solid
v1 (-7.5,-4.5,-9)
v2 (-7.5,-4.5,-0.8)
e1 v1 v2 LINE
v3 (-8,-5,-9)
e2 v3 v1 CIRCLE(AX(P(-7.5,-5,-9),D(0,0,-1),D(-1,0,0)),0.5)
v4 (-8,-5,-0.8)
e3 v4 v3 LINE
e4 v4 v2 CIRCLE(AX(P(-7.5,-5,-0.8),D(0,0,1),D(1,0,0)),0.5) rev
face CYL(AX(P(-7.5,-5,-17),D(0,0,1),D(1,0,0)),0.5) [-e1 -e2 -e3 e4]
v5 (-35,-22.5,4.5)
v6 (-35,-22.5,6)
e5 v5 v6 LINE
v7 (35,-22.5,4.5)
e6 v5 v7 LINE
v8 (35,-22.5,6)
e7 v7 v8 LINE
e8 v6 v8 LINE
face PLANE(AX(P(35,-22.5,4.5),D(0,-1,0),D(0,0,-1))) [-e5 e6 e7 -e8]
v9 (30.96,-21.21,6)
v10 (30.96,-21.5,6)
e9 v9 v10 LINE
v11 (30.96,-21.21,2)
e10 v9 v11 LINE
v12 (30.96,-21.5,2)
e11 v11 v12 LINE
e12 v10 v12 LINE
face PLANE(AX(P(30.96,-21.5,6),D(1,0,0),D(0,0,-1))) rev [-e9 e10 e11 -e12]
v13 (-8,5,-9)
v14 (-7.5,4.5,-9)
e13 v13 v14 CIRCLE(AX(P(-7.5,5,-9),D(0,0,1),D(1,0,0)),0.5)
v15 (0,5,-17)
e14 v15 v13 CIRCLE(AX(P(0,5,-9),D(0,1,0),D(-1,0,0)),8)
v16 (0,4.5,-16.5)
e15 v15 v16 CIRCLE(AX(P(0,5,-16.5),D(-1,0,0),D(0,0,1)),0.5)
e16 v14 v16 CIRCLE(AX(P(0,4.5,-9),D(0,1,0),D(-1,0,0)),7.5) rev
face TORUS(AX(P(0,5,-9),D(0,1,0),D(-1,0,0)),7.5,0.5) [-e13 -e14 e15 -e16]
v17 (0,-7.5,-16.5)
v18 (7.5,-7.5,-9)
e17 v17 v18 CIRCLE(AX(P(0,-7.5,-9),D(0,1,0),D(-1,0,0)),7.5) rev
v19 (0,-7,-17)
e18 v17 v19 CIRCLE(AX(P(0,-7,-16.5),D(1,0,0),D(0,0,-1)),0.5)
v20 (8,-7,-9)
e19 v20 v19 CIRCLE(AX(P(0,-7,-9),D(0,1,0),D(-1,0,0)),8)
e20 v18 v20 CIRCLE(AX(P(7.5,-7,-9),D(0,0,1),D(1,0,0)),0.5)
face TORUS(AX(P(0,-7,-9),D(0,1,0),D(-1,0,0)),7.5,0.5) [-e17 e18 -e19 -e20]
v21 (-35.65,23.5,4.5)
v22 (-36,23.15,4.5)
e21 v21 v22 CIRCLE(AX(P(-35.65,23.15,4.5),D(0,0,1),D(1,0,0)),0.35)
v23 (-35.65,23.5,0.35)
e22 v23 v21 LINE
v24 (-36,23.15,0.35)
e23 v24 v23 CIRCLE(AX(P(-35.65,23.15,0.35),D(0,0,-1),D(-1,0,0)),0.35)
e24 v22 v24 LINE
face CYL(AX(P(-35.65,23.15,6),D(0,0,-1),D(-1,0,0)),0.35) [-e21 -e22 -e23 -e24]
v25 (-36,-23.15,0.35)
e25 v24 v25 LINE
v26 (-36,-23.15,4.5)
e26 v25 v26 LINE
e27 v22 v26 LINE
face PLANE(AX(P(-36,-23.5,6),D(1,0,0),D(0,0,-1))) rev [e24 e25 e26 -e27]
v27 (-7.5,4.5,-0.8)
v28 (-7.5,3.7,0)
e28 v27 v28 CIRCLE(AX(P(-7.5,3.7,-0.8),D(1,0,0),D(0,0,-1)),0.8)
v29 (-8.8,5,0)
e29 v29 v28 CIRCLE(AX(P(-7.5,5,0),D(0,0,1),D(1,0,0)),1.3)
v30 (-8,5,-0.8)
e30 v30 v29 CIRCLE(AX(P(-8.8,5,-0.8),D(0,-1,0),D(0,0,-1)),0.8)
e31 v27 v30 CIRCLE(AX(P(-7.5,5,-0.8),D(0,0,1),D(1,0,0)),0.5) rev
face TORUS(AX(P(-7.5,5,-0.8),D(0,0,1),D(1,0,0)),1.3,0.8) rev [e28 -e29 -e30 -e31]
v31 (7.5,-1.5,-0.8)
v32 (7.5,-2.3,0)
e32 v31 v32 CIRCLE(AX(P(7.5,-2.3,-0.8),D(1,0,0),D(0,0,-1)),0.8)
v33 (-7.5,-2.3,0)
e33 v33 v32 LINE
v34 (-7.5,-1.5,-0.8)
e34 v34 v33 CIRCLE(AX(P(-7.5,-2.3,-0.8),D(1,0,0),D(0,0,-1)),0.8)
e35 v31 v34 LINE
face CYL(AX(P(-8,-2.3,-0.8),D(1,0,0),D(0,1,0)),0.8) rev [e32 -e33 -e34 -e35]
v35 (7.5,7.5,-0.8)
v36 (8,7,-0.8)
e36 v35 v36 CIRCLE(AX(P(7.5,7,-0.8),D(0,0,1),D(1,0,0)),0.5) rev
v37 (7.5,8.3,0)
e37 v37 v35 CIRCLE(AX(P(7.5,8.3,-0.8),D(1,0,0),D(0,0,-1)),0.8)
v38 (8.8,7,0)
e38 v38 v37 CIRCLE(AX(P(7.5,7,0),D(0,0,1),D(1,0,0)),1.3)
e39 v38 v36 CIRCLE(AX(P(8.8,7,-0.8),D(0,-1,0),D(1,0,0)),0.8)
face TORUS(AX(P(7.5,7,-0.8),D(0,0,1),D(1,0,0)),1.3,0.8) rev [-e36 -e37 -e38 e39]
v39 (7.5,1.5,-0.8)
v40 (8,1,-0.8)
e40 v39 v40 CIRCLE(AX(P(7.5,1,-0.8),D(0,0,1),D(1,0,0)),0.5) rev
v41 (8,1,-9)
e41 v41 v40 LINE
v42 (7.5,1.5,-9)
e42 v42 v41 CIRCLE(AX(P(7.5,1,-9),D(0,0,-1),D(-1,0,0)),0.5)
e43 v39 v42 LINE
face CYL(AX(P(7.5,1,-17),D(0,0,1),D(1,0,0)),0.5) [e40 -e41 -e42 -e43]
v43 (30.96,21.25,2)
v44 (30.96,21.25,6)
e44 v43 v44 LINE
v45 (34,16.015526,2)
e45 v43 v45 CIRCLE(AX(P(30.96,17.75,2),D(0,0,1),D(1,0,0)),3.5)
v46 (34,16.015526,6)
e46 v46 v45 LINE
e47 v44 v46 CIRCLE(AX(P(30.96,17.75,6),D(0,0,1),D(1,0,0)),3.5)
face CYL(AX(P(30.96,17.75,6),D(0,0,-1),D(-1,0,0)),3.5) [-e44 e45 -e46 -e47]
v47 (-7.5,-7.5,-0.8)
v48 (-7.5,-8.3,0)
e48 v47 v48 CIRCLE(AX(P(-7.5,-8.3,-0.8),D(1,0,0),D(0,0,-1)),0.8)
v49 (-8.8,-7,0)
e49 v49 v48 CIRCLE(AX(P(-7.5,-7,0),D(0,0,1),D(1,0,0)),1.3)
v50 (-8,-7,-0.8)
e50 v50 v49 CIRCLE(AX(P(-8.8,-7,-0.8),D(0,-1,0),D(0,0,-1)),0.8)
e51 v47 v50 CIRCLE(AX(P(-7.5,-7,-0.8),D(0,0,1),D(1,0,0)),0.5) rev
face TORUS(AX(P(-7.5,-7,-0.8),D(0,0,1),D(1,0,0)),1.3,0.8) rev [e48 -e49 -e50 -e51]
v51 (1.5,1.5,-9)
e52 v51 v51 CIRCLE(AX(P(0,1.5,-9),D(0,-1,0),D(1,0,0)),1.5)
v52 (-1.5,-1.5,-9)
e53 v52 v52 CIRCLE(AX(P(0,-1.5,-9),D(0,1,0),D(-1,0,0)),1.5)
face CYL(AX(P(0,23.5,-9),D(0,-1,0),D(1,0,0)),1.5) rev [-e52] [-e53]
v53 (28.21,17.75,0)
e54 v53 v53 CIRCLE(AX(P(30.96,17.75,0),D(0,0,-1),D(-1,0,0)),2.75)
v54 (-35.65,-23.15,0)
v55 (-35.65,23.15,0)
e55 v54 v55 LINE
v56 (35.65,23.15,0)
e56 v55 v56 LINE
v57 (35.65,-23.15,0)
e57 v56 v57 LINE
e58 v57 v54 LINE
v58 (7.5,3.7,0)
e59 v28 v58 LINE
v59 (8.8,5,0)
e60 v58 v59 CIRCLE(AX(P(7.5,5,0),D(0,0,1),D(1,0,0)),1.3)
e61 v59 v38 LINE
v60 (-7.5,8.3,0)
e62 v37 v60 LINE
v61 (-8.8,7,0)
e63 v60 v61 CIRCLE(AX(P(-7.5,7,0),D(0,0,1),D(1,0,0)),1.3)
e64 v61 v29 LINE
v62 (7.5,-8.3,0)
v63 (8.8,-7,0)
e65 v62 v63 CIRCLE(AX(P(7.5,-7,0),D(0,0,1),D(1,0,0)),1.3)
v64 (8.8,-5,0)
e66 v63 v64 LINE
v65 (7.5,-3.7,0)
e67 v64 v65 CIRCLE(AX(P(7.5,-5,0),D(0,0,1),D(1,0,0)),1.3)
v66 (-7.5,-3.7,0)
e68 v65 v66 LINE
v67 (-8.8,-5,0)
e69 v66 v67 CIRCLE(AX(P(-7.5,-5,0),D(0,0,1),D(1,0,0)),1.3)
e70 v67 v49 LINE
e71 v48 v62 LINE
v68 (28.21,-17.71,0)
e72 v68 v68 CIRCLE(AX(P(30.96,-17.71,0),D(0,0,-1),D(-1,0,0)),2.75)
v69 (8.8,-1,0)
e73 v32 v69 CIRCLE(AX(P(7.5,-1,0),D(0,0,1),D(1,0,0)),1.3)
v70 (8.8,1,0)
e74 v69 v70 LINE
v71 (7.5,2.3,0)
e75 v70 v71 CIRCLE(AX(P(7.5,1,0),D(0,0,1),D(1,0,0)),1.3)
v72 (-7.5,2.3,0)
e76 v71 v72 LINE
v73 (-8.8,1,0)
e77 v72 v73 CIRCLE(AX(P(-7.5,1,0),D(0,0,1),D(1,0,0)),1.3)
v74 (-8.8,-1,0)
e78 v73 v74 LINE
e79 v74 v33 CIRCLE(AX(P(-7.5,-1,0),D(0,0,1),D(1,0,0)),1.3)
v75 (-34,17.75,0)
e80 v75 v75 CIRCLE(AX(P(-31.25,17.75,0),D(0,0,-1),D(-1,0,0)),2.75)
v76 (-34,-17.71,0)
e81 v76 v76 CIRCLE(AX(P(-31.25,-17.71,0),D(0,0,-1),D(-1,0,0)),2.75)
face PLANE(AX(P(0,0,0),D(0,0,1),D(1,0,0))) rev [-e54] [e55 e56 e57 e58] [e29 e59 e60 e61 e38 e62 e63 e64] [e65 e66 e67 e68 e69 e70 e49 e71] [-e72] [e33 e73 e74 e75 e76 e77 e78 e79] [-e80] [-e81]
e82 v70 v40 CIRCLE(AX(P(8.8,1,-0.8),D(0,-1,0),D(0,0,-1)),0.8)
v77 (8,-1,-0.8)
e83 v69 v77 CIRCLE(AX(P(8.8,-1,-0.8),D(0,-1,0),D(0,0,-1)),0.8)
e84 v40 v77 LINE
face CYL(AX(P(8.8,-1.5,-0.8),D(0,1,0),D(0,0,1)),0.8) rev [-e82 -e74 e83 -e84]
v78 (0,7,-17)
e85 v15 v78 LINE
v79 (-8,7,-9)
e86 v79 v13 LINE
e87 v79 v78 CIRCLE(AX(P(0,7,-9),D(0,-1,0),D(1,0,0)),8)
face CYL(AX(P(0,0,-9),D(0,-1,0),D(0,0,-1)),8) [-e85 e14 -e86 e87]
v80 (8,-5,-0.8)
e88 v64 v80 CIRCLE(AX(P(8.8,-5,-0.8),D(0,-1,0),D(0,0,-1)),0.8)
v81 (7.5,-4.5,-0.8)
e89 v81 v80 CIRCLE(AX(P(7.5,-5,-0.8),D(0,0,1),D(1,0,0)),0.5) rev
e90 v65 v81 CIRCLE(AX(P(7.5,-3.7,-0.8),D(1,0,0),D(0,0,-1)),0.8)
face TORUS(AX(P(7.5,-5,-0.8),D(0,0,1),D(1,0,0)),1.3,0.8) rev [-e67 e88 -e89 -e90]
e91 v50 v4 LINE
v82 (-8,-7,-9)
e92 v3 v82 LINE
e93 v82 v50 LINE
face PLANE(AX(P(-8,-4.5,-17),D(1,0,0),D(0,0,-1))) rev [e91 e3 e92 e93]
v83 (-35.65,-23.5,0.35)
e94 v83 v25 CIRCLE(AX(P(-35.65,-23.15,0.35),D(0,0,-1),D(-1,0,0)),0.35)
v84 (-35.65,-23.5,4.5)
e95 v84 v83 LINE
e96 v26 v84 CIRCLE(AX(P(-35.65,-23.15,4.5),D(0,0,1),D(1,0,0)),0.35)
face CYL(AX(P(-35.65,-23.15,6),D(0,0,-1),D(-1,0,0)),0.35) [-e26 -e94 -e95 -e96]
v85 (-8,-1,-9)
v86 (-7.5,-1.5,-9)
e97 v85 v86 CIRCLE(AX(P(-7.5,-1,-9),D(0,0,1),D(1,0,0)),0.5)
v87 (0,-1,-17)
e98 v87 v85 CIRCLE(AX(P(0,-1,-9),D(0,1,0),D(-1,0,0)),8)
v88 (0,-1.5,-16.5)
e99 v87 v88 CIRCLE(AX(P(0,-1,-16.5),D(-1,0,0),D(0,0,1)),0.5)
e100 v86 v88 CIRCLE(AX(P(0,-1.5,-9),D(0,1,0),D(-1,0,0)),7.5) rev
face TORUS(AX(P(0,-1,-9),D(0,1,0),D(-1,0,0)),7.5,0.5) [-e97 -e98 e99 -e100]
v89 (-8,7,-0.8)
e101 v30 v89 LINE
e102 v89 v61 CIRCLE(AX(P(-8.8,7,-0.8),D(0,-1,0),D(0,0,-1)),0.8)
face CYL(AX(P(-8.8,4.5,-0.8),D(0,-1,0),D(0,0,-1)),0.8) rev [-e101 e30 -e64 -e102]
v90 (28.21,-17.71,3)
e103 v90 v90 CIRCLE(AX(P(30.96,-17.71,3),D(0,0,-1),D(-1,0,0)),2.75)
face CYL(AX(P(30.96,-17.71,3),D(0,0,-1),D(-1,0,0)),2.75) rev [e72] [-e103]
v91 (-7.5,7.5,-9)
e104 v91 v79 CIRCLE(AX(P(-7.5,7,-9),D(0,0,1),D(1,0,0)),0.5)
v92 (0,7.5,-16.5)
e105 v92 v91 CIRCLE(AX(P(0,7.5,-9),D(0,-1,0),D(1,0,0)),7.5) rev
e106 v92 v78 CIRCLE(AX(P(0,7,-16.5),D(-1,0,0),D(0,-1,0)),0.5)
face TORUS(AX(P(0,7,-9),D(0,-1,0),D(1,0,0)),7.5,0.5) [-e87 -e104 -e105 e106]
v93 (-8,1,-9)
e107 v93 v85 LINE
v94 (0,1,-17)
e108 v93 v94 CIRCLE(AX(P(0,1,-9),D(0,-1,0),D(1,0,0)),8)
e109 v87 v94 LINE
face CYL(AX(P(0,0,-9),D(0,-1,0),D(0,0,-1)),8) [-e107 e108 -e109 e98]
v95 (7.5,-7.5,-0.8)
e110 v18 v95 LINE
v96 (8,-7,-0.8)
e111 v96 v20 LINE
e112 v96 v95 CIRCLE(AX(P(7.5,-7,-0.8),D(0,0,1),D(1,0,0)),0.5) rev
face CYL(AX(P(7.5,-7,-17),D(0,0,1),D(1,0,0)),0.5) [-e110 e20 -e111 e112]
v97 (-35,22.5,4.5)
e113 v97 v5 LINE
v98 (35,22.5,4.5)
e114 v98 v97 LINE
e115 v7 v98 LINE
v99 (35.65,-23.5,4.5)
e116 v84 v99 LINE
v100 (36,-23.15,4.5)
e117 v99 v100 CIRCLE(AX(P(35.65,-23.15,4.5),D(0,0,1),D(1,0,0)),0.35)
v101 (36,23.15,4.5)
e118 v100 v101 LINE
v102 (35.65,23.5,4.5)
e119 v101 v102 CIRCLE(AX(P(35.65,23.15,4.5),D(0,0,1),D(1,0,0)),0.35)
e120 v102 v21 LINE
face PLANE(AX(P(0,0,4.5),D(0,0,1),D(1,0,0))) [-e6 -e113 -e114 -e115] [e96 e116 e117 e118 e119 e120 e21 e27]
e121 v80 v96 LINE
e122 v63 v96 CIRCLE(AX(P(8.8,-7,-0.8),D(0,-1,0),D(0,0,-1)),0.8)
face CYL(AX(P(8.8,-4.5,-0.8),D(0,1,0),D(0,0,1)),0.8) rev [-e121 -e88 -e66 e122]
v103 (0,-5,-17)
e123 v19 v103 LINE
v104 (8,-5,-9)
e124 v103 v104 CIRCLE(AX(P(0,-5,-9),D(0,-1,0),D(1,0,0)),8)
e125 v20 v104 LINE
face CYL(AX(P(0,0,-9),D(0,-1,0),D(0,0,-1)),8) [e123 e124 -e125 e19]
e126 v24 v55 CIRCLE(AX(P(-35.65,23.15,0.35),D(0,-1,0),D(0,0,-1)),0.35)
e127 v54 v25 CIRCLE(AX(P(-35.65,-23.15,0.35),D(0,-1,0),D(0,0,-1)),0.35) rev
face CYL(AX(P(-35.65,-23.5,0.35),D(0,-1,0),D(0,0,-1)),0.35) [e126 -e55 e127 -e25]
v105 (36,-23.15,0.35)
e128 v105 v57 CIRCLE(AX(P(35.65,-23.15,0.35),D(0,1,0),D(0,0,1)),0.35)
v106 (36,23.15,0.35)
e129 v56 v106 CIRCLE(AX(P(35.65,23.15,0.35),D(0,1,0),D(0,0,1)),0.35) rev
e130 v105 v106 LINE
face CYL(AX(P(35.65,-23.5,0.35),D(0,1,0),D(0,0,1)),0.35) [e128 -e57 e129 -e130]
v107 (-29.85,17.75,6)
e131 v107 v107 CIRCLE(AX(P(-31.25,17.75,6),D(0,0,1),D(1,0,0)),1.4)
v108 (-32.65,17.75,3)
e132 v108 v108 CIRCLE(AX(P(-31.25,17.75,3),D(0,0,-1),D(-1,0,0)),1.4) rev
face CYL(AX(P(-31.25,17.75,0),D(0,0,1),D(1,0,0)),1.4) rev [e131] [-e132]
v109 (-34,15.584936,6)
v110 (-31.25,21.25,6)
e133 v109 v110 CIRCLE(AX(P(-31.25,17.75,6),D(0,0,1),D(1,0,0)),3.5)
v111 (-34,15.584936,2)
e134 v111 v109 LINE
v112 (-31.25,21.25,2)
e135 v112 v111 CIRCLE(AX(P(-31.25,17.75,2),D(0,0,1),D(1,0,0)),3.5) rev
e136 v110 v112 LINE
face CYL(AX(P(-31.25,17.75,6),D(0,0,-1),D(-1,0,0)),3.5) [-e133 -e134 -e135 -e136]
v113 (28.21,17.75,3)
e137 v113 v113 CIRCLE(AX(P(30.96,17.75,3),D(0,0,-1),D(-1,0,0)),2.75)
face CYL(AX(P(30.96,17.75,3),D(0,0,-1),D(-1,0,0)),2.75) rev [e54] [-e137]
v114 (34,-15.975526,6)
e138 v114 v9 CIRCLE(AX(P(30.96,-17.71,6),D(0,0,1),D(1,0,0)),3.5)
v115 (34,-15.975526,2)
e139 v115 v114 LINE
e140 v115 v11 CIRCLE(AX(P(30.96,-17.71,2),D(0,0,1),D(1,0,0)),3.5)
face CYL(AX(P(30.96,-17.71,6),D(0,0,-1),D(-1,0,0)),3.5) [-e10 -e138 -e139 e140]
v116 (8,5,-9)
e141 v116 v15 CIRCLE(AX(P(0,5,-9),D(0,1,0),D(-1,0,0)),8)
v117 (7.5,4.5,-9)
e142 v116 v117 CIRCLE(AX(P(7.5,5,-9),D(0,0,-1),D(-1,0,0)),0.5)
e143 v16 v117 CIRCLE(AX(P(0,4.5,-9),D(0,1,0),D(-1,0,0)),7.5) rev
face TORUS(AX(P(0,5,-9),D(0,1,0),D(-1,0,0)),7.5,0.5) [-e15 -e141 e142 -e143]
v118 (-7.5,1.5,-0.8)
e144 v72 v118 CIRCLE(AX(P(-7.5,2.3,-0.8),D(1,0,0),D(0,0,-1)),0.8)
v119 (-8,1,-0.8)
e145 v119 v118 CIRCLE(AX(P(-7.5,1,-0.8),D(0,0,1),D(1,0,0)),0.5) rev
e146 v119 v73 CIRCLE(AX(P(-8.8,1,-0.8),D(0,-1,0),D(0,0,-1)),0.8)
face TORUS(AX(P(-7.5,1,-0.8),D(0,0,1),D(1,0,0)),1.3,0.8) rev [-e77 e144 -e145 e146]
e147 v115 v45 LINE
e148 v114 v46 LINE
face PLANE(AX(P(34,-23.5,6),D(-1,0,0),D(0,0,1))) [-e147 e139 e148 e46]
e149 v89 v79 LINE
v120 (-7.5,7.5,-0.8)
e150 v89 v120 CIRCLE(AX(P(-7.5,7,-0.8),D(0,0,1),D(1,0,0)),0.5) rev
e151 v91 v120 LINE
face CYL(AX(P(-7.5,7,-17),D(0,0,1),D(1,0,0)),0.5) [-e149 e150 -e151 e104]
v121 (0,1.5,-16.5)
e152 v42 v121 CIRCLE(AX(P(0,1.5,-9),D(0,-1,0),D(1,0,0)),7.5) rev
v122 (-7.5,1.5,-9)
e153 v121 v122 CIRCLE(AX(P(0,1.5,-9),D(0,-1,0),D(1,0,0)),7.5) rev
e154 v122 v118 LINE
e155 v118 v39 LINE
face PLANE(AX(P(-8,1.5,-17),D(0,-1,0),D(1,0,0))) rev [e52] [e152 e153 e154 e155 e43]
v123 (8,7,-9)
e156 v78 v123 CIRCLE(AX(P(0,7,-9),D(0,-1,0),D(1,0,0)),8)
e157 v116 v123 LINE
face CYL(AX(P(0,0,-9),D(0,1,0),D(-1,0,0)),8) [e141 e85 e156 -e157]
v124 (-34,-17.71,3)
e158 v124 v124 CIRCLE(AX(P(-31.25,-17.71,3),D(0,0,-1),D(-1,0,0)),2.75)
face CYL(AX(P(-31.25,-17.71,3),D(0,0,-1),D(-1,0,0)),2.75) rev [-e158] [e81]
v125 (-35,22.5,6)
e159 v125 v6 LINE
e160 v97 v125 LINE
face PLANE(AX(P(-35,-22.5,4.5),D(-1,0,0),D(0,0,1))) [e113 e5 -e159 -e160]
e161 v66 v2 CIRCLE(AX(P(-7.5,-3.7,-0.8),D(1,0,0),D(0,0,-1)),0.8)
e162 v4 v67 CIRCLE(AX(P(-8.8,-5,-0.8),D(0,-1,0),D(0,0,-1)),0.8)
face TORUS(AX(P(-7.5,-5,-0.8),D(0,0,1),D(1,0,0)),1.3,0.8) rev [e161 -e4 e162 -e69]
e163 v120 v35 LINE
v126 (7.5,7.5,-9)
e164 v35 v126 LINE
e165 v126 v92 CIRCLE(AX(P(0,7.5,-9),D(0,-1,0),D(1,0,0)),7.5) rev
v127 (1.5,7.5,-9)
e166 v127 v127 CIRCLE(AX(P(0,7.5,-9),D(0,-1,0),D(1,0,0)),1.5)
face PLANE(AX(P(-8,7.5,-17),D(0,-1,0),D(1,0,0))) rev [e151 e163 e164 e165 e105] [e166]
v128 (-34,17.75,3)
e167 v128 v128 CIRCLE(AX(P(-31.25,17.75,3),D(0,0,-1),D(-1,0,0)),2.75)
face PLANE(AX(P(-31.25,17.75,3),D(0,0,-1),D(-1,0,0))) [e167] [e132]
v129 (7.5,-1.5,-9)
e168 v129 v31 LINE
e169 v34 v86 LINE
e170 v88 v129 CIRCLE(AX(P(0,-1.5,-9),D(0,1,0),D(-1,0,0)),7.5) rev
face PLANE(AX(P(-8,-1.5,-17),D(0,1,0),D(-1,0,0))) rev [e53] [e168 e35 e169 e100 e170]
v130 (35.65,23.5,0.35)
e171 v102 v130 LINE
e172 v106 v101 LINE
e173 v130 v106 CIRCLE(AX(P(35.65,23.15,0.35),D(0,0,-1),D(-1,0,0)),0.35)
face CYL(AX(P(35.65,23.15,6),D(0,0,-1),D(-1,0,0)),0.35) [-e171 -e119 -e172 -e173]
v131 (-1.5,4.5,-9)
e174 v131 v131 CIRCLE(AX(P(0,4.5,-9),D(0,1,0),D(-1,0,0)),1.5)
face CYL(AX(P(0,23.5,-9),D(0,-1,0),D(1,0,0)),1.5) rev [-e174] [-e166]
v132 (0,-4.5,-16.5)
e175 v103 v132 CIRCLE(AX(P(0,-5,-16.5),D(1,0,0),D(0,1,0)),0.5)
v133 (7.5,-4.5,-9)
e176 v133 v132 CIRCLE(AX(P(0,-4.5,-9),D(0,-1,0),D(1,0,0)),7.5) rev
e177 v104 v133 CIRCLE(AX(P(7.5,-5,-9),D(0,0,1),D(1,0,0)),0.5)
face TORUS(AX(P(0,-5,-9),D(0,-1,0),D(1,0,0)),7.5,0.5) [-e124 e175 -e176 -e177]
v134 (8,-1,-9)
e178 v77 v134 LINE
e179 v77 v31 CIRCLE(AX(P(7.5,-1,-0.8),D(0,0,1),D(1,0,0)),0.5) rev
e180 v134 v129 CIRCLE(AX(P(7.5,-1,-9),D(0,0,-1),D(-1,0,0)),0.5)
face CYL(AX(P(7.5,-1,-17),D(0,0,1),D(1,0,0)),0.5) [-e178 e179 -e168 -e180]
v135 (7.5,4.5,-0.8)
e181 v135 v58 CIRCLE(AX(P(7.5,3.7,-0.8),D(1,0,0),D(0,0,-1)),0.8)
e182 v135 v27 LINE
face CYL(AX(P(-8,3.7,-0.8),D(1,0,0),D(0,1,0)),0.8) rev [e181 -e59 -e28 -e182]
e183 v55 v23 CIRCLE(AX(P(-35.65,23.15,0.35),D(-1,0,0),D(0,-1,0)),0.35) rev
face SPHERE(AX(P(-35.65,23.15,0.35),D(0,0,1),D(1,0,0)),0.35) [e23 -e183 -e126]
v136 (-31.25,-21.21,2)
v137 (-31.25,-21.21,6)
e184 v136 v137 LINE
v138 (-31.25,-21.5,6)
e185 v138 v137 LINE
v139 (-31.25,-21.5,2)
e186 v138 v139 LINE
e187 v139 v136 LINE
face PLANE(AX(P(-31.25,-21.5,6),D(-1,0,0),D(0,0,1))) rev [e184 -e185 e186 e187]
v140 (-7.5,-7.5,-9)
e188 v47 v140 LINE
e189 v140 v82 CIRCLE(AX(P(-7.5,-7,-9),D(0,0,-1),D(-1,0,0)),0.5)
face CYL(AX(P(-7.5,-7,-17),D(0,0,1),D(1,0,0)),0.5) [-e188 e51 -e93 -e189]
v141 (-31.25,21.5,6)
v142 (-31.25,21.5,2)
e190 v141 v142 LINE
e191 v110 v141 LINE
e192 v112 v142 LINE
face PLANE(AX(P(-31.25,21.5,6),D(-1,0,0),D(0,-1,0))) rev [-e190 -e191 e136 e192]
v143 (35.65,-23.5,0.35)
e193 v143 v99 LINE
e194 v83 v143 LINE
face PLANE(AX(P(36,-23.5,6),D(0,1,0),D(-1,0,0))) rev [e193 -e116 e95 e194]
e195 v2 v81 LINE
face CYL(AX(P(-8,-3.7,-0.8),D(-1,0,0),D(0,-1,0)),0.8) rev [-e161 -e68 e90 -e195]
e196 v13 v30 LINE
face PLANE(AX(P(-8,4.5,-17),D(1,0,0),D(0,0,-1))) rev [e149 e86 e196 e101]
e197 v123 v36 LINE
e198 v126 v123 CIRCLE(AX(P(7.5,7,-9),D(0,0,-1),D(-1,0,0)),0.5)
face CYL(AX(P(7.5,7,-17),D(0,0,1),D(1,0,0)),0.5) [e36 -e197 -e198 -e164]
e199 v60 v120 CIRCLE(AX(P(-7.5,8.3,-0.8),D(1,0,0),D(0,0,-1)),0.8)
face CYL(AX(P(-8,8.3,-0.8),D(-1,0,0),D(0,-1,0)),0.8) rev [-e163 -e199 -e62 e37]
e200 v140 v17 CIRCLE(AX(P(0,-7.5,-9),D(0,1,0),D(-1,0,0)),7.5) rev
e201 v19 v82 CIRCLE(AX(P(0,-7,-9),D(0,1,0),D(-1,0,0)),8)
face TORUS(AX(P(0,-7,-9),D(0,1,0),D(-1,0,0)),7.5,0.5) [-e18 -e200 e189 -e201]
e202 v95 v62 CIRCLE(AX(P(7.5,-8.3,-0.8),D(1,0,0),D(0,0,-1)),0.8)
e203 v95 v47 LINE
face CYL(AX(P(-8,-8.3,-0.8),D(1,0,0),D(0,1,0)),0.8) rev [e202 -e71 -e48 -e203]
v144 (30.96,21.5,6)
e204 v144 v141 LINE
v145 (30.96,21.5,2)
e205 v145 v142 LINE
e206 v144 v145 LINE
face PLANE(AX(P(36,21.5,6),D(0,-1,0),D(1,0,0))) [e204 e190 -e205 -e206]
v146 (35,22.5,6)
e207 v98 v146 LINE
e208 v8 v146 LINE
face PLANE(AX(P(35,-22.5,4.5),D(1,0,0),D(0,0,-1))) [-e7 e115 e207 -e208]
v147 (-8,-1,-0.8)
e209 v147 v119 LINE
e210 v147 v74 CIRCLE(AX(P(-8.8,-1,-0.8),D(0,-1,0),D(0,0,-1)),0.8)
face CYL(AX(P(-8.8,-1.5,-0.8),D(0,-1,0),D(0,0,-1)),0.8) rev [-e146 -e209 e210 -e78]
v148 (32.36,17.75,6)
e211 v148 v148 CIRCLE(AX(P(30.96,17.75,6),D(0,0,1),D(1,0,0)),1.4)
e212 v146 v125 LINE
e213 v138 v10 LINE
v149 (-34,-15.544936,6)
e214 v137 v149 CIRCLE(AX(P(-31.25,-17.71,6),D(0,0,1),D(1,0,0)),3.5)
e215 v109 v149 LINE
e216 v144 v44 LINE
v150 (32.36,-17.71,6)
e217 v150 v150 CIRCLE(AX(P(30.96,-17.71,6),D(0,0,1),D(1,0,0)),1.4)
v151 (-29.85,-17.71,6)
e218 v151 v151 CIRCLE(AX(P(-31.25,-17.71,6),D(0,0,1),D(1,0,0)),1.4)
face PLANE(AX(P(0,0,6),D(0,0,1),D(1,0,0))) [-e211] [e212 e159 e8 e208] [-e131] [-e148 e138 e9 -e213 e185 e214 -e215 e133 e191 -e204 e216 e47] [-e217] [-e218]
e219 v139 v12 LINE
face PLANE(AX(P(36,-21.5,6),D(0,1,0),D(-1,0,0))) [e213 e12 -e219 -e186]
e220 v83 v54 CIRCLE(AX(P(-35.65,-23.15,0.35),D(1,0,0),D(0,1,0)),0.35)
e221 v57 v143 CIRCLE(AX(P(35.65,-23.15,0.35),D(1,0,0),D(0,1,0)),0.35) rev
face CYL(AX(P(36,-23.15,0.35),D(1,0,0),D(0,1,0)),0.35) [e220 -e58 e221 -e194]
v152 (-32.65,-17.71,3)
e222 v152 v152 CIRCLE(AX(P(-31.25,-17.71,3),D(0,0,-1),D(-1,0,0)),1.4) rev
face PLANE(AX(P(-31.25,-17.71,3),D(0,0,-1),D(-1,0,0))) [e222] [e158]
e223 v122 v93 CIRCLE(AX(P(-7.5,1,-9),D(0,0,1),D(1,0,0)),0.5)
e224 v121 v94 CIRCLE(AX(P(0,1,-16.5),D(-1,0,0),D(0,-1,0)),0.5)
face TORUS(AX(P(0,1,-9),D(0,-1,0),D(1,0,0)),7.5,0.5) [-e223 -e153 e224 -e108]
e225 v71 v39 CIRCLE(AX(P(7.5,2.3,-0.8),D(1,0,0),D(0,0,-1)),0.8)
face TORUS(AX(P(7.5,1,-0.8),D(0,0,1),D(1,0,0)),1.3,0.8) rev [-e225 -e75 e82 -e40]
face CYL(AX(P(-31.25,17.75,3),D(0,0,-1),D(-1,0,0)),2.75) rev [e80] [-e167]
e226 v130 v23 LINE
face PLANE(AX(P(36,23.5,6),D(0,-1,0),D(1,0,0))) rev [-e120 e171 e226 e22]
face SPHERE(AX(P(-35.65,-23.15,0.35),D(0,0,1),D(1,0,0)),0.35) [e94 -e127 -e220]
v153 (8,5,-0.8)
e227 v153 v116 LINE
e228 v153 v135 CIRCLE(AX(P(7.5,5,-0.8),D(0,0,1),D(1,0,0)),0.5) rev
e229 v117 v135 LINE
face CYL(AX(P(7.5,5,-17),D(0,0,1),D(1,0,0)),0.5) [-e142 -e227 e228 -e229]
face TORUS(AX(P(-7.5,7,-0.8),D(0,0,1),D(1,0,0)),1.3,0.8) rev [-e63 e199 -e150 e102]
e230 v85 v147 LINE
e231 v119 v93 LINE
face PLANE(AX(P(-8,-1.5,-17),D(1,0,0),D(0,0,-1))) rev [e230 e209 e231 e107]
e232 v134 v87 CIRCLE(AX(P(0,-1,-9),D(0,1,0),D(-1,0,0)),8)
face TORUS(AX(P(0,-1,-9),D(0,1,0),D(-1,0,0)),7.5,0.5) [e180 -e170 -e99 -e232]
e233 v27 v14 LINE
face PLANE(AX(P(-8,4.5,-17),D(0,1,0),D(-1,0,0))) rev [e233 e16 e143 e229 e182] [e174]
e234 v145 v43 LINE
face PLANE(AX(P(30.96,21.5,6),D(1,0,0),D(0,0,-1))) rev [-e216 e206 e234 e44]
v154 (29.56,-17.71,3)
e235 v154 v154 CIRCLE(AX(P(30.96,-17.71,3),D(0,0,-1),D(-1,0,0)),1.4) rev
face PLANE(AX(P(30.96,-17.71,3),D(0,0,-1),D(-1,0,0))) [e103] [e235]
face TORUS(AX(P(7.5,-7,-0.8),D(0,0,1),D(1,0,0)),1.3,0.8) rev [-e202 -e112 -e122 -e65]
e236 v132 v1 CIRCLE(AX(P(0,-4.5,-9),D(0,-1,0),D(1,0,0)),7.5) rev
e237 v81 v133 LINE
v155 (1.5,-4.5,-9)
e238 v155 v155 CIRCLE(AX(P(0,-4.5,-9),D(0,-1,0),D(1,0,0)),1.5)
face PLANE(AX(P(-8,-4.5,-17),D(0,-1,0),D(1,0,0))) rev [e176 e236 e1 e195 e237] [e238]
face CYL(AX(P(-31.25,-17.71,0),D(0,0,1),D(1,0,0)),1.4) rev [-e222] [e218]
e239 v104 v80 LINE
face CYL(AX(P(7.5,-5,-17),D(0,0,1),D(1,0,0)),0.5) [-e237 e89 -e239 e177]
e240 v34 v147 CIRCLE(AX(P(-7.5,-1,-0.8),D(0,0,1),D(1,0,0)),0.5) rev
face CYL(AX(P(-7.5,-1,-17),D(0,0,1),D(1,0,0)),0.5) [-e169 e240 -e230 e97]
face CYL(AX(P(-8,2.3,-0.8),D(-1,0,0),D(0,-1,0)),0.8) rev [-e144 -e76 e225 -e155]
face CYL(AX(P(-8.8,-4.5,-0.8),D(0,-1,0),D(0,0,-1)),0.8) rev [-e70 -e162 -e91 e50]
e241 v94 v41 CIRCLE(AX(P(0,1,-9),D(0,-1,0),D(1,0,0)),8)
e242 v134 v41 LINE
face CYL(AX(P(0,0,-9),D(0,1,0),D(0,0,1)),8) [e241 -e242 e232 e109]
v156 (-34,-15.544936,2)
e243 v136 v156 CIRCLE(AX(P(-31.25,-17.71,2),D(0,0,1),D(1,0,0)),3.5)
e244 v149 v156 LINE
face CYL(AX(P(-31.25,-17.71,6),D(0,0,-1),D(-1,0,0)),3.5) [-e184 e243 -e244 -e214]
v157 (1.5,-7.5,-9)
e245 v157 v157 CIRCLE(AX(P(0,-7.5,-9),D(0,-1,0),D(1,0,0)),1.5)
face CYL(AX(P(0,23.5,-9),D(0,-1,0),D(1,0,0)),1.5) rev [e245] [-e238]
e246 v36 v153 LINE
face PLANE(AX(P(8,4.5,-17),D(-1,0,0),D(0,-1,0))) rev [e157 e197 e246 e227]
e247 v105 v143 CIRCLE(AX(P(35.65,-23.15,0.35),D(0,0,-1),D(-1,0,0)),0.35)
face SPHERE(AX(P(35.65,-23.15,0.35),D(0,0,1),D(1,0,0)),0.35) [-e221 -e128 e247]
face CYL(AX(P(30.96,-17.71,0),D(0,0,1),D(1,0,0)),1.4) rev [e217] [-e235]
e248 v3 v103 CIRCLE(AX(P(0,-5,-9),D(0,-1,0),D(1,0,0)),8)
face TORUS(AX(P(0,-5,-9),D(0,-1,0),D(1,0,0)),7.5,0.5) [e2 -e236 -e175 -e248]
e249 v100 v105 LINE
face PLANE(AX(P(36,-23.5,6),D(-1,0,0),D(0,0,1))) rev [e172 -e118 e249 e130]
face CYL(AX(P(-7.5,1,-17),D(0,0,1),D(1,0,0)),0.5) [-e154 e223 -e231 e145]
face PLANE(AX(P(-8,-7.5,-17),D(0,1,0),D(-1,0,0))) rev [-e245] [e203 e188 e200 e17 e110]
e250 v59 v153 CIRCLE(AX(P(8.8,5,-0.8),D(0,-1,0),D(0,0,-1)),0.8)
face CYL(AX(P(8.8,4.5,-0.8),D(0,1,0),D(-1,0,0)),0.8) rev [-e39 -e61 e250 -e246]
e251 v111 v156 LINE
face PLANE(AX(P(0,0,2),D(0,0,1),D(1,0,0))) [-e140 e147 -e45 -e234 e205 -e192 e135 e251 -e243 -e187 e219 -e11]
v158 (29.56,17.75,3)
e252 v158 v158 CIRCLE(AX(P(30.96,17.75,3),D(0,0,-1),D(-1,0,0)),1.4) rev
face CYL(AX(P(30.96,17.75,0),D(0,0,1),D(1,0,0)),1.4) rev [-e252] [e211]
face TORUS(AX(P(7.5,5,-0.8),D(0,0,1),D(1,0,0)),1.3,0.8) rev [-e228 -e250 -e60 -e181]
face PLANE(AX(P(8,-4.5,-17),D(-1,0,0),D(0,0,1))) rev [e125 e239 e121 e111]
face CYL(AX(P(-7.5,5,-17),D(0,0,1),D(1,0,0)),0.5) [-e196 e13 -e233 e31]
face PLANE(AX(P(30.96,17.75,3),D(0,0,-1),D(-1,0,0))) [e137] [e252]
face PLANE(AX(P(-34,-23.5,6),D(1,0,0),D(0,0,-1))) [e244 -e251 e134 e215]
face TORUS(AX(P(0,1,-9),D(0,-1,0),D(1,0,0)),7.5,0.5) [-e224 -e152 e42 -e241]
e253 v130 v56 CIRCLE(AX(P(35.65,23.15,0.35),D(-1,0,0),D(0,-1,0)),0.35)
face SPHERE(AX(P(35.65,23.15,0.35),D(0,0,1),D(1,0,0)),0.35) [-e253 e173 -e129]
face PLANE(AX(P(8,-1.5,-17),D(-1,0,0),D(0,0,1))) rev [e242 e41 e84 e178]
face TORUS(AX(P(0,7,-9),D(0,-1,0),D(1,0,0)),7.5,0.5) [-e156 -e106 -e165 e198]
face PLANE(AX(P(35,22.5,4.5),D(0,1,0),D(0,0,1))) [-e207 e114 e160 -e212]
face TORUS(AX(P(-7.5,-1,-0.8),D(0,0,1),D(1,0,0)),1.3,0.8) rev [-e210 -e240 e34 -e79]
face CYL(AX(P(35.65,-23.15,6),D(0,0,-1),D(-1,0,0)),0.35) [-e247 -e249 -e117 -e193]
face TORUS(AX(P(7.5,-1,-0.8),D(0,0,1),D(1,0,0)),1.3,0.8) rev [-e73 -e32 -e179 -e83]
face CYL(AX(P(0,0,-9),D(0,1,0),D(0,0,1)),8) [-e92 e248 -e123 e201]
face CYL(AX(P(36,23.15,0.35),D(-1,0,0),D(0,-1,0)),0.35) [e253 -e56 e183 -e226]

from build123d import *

# Parameters (mm, degrees)
SKETCH1_W           = 72
SKETCH1_H           = 47
BOSS_EXTRUDE1_DEPTH = 6
SHELL1_T            = -2
SKETCH3_OUTSIDE_W   = 91.238
SKETCH3_OUTSIDE_H   = 66.238
SKETCH3_OUTSIDE_W_2 = 70
SKETCH3_OUTSIDE_H_2 = 45
CUT_EXTRUDE1_DEPTH  = 1.5
SKETCH2_R           = 3.5
BOSS_EXTRUDE2_DEPTH = 4
SKETCH4_W           = 2.75
SKETCH4_H           = 3.79
SKETCH4_H_2         = 3.75
SKETCH4_W_2         = 3.04
BOSS_EXTRUDE3_DEPTH = 4
SKETCH5_R           = 1.4
CUT_EXTRUDE2_DEPTH  = 44.407948581
SKETCH6_R           = 2.75
CUT_EXTRUDE3_DEPTH  = 3
SKETCH7_W           = 16
SKETCH7_H           = 3
BOSS_EXTRUDE5_DEPTH = 17
FILLET2_R           = 8
SKETCH9_R           = 1.5
CUT_EXTRUDE5_DEPTH  = 51.457903246
FILLET3_R           = 0.35
FILLET4_R           = 0.5
FILLET5_R           = 0.8
FILLET6_R           = 0.35


# Some blends are built 0.0001 mm under size
with BuildPart() as part:
    # Sketch1 → Boss-Extrude1 (new body)
    with BuildSketch(Plane.XY):
        Rectangle(SKETCH1_W, SKETCH1_H)
    extrude(amount=BOSS_EXTRUDE1_DEPTH)

    # Shell1
    shell1_openings = [part.faces().sort_by_distance(p)[0] for p in [
        (0, 0, 6),
    ]]
    offset(amount=SHELL1_T, openings=shell1_openings, kind=Kind.INTERSECTION)

    # Sketch3 outside → Cut-Extrude1 (cut)
    with BuildSketch(Plane.XY.offset(6)):
        Rectangle(SKETCH3_OUTSIDE_W, SKETCH3_OUTSIDE_H)
        Rectangle(SKETCH3_OUTSIDE_W_2, SKETCH3_OUTSIDE_H_2, mode=Mode.SUBTRACT)
    extrude(amount=-CUT_EXTRUDE1_DEPTH, mode=Mode.SUBTRACT)

    # Sketch2 → Boss-Extrude2 (add)
    with BuildSketch(Plane.XY.offset(2)):
        with Locations((-31.25, 17.75)):
            Circle(SKETCH2_R)
        with Locations((30.96, 17.75)):
            Circle(SKETCH2_R)
        with Locations((-31.25, -17.71)):
            Circle(SKETCH2_R)
        with Locations((30.96, -17.71)):
            Circle(SKETCH2_R)
    extrude(amount=BOSS_EXTRUDE2_DEPTH)

    # Sketch4 → Boss-Extrude3 (add)
    with BuildSketch(Plane.XY.offset(2)):
        with Locations((-32.625, -19.605)):
            Rectangle(SKETCH4_W, SKETCH4_H)
        with Locations((-32.625, 19.625)):
            Rectangle(SKETCH4_W, SKETCH4_H_2)
        with Locations((32.48, 19.625)):
            Rectangle(SKETCH4_W_2, SKETCH4_H_2)
        with Locations((32.48, -19.605)):
            Rectangle(SKETCH4_W_2, SKETCH4_H)
    extrude(amount=BOSS_EXTRUDE3_DEPTH)

    # Sketch5 → Cut-Extrude2 (cut, through all)
    with BuildSketch(Plane.XY.offset(6)):
        with Locations((30.96, -17.71)):
            Circle(SKETCH5_R)
        with Locations((30.96, 17.75)):
            Circle(SKETCH5_R)
        with Locations((-31.25, -17.71)):
            Circle(SKETCH5_R)
        with Locations((-31.25, 17.75)):
            Circle(SKETCH5_R)
    extrude(amount=-CUT_EXTRUDE2_DEPTH, mode=Mode.SUBTRACT)

    # Sketch6 → Cut-Extrude3 (cut)
    with BuildSketch(Plane(origin=(0, 0, 0), x_dir=(-1, 0, 0), z_dir=(0, 0, -1))):
        with Locations((31.25, 17.75)):
            Circle(SKETCH6_R)
        with Locations((-30.96, 17.75)):
            Circle(SKETCH6_R)
        with Locations((31.25, -17.71)):
            Circle(SKETCH6_R)
        with Locations((-30.96, -17.71)):
            Circle(SKETCH6_R)
    extrude(amount=-CUT_EXTRUDE3_DEPTH, mode=Mode.SUBTRACT)

    # Sketch7 → Boss-Extrude5 (add)
    with BuildSketch(Plane(origin=(0, 0, 0), x_dir=(-1, 0, 0), z_dir=(0, 0, -1))):
        Rectangle(SKETCH7_W, SKETCH7_H)
        with Locations((0, 6)):
            Rectangle(SKETCH7_W, SKETCH7_H)
        with Locations((0, -6)):
            Rectangle(SKETCH7_W, SKETCH7_H)
    extrude(amount=BOSS_EXTRUDE5_DEPTH)

    # Fillet2
    fillet2_edges = [part.edges().sort_by_distance(p)[0] for p in [
        (8, -6, -17),
        (8, 0, -17),
        (8, 6, -17),
        (-8, 6, -17),
        (-8, 0, -17),
        (-8, -6, -17),
    ]]
    fillet(fillet2_edges, radius=FILLET2_R - 0.0001)  # a hair under: the kernel refuses the full size

    # Sketch9 → Cut-Extrude5 (cut, through all)
    with BuildSketch(Plane.XZ.offset(7.5)):
        with Locations((0, -9)):
            Circle(SKETCH9_R)
    extrude(amount=-CUT_EXTRUDE5_DEPTH, mode=Mode.SUBTRACT)

    # Fillet3
    fillet3_edges = [part.edges().sort_by_distance(p)[0] for p in [
        (0, 23.5, 0),
        (36, 0, 0),
        (0, -23.5, 0),
        (-36, 0, 0),
    ]]
    fillet(fillet3_edges, radius=FILLET3_R)

    # Fillet4
    fillet4_edges = [part.edges().sort_by_distance(p)[0] for p in [
        (-8, -7.5, -4.50005),
        (8, -7.5, -4.50005),
        (-5.656883539, -7.5, -14.656883539),
        (5.656883539, -7.5, -14.656883539),
        (8, -4.5, -4.50005),
        (-8, -4.5, -4.50005),
        (-5.656883539, -4.5, -14.656883539),
        (5.656883539, -4.5, -14.656883539),
        (-8, -1.5, -4.50005),
        (8, -1.5, -4.50005),
        (-5.656883539, -1.5, -14.656883539),
        (5.656883539, -1.5, -14.656883539),
        (8, 1.5, -4.50005),
        (-8, 1.5, -4.50005),
        (-5.656883539, 1.5, -14.656883539),
        (5.656883539, 1.5, -14.656883539),
        (-8, 4.5, -4.50005),
        (8, 4.5, -4.50005),
        (-5.656883539, 4.5, -14.656883539),
        (5.656883539, 4.5, -14.656883539),
        (8, 7.5, -4.50005),
        (-8, 7.5, -4.50005),
        (-5.656883539, 7.5, -14.656883539),
        (5.656883539, 7.5, -14.656883539),
    ]]
    fillet(fillet4_edges, radius=FILLET4_R)

    # Fillet5
    fillet5_edges = [part.edges().sort_by_distance(p)[0] for p in [
        (0, 7.5, 0),
        (-8, 6, 0),
        (0, 1.5, 0),
        (-8, 0, 0),
        (0, 4.5, 0),
        (0, -1.5, 0),
        (0, -7.5, 0),
        (8, -6, 0),
        (0, -4.5, 0),
        (8, 6, 0),
        (8, 0, 0),
        (-8, -6, 0),
        (-7.853553391, 7.353553391, 0),
        (-7.853553391, 1.353553391, 0),
        (-7.853553391, 4.646446609, 0),
        (-7.853553391, -1.353553391, 0),
        (7.853553391, -7.353553391, 0),
        (7.853553391, -4.646446609, 0),
        (7.853553391, 7.353553391, 0),
        (7.853553391, 1.353553391, 0),
        (7.853553391, 4.646446609, 0),
        (7.853553391, -1.353553391, 0),
        (-7.853553391, -7.353553391, 0),
        (-7.853553391, -4.646446609, 0),
    ]]
    fillet(fillet5_edges, radius=FILLET5_R)

    # Fillet6
    # the kernel refuses this fillet: 0.35 mm, written as the material it takes off along each edge
    with BuildSketch(Plane(origin=(-35.65, -23.15, 0.35), x_dir=(0, -1, 0), z_dir=(-1, 0, 0))) as fillet6_piece_1_section:
        Polygon((0, 0), (FILLET6_R, 0), (FILLET6_R, -FILLET6_R), (0, -FILLET6_R), align=None)
    fillet6_piece_1 = extrude(amount=FILLET6_R, mode=Mode.PRIVATE)
    fillet6_piece_1 = fillet6_piece_1 - Plane(origin=(-35.65, -23.15, 0.35), x_dir=(0, 0.7071067811865475, 0.7071067811865475), z_dir=(-1, 0, 0)) * Sphere(FILLET6_R, mode=Mode.PRIVATE)
    add(fillet6_piece_1, mode=Mode.SUBTRACT)
    with BuildSketch(Plane(origin=(-35.65, 23.15, 0.35), x_dir=(-1, 0, 0), z_dir=(0, 1, 0))) as fillet6_piece_2_section:
        Polygon((0, 0), (FILLET6_R, 0), (FILLET6_R, -FILLET6_R), (0, -FILLET6_R), align=None)
    fillet6_piece_2 = extrude(amount=FILLET6_R, mode=Mode.PRIVATE)
    fillet6_piece_2 = fillet6_piece_2 - Plane(origin=(-35.65, 23.15, 0.35), x_dir=(0.7071067811865475, 0, 0.7071067811865475), z_dir=(0, 1, 0)) * Sphere(FILLET6_R, mode=Mode.PRIVATE)
    add(fillet6_piece_2, mode=Mode.SUBTRACT)
    with BuildSketch(Plane(origin=(35.65, -23.15, 0.35), x_dir=(0, -1, 0), z_dir=(1, 0, 0))) as fillet6_piece_3_section:
        Polygon((0, 0), (FILLET6_R, 0), (FILLET6_R, FILLET6_R), (0, FILLET6_R), align=None)
    fillet6_piece_3 = extrude(amount=FILLET6_R, mode=Mode.PRIVATE)
    fillet6_piece_3 = fillet6_piece_3 - Plane(origin=(35.65, -23.15, 0.35), x_dir=(0, 0.7071067811865475, 0.7071067811865475), z_dir=(1, 0, 0)) * Sphere(FILLET6_R, mode=Mode.PRIVATE)
    add(fillet6_piece_3, mode=Mode.SUBTRACT)
    with BuildSketch(Plane(origin=(35.65, 23.15, 0.35), x_dir=(1, 0, 0), z_dir=(0, 1, 0))) as fillet6_piece_4_section:
        Polygon((0, 0), (FILLET6_R, 0), (FILLET6_R, FILLET6_R), (0, FILLET6_R), align=None)
    fillet6_piece_4 = extrude(amount=FILLET6_R, mode=Mode.PRIVATE)
    fillet6_piece_4 = fillet6_piece_4 - Plane(origin=(35.65, 23.15, 0.35), x_dir=(-0.7071067811865475, 0, 0.7071067811865475), z_dir=(0, 1, 0)) * Sphere(FILLET6_R, mode=Mode.PRIVATE)
    add(fillet6_piece_4, mode=Mode.SUBTRACT)
    with BuildSketch(Plane(origin=(-36, 23.5, 0.35), x_dir=(1, 0, 0), z_dir=(0, 0, 1)), Plane(origin=(-36, -23.5, 0.35), x_dir=(0, 1, 0), z_dir=(0, 0, 1))) as fillet6_piece_5:
        with BuildLine():
            CenterArc((FILLET6_R, -FILLET6_R), FILLET6_R, 90, 90)
            Line((0, -FILLET6_R), (0, 0))
            Line((0, 0), (FILLET6_R, 0))
        make_face()
    extrude(amount=5.025, mode=Mode.SUBTRACT)
    with BuildSketch(Plane(origin=(36, 23.5, 0.35), x_dir=(-1, 0, 0), z_dir=(0, 0, 1)), Plane(origin=(36, -23.5, 0.35), x_dir=(0, 1, 0), z_dir=(0, 0, 1))) as fillet6_piece_6:
        with BuildLine():
            CenterArc((FILLET6_R, FILLET6_R), FILLET6_R, 180, 90)
            Line((0, FILLET6_R), (0, 0))
            Line((0, 0), (FILLET6_R, 0))
        make_face()
    extrude(amount=5.025, mode=Mode.SUBTRACT)


solid = part.part
